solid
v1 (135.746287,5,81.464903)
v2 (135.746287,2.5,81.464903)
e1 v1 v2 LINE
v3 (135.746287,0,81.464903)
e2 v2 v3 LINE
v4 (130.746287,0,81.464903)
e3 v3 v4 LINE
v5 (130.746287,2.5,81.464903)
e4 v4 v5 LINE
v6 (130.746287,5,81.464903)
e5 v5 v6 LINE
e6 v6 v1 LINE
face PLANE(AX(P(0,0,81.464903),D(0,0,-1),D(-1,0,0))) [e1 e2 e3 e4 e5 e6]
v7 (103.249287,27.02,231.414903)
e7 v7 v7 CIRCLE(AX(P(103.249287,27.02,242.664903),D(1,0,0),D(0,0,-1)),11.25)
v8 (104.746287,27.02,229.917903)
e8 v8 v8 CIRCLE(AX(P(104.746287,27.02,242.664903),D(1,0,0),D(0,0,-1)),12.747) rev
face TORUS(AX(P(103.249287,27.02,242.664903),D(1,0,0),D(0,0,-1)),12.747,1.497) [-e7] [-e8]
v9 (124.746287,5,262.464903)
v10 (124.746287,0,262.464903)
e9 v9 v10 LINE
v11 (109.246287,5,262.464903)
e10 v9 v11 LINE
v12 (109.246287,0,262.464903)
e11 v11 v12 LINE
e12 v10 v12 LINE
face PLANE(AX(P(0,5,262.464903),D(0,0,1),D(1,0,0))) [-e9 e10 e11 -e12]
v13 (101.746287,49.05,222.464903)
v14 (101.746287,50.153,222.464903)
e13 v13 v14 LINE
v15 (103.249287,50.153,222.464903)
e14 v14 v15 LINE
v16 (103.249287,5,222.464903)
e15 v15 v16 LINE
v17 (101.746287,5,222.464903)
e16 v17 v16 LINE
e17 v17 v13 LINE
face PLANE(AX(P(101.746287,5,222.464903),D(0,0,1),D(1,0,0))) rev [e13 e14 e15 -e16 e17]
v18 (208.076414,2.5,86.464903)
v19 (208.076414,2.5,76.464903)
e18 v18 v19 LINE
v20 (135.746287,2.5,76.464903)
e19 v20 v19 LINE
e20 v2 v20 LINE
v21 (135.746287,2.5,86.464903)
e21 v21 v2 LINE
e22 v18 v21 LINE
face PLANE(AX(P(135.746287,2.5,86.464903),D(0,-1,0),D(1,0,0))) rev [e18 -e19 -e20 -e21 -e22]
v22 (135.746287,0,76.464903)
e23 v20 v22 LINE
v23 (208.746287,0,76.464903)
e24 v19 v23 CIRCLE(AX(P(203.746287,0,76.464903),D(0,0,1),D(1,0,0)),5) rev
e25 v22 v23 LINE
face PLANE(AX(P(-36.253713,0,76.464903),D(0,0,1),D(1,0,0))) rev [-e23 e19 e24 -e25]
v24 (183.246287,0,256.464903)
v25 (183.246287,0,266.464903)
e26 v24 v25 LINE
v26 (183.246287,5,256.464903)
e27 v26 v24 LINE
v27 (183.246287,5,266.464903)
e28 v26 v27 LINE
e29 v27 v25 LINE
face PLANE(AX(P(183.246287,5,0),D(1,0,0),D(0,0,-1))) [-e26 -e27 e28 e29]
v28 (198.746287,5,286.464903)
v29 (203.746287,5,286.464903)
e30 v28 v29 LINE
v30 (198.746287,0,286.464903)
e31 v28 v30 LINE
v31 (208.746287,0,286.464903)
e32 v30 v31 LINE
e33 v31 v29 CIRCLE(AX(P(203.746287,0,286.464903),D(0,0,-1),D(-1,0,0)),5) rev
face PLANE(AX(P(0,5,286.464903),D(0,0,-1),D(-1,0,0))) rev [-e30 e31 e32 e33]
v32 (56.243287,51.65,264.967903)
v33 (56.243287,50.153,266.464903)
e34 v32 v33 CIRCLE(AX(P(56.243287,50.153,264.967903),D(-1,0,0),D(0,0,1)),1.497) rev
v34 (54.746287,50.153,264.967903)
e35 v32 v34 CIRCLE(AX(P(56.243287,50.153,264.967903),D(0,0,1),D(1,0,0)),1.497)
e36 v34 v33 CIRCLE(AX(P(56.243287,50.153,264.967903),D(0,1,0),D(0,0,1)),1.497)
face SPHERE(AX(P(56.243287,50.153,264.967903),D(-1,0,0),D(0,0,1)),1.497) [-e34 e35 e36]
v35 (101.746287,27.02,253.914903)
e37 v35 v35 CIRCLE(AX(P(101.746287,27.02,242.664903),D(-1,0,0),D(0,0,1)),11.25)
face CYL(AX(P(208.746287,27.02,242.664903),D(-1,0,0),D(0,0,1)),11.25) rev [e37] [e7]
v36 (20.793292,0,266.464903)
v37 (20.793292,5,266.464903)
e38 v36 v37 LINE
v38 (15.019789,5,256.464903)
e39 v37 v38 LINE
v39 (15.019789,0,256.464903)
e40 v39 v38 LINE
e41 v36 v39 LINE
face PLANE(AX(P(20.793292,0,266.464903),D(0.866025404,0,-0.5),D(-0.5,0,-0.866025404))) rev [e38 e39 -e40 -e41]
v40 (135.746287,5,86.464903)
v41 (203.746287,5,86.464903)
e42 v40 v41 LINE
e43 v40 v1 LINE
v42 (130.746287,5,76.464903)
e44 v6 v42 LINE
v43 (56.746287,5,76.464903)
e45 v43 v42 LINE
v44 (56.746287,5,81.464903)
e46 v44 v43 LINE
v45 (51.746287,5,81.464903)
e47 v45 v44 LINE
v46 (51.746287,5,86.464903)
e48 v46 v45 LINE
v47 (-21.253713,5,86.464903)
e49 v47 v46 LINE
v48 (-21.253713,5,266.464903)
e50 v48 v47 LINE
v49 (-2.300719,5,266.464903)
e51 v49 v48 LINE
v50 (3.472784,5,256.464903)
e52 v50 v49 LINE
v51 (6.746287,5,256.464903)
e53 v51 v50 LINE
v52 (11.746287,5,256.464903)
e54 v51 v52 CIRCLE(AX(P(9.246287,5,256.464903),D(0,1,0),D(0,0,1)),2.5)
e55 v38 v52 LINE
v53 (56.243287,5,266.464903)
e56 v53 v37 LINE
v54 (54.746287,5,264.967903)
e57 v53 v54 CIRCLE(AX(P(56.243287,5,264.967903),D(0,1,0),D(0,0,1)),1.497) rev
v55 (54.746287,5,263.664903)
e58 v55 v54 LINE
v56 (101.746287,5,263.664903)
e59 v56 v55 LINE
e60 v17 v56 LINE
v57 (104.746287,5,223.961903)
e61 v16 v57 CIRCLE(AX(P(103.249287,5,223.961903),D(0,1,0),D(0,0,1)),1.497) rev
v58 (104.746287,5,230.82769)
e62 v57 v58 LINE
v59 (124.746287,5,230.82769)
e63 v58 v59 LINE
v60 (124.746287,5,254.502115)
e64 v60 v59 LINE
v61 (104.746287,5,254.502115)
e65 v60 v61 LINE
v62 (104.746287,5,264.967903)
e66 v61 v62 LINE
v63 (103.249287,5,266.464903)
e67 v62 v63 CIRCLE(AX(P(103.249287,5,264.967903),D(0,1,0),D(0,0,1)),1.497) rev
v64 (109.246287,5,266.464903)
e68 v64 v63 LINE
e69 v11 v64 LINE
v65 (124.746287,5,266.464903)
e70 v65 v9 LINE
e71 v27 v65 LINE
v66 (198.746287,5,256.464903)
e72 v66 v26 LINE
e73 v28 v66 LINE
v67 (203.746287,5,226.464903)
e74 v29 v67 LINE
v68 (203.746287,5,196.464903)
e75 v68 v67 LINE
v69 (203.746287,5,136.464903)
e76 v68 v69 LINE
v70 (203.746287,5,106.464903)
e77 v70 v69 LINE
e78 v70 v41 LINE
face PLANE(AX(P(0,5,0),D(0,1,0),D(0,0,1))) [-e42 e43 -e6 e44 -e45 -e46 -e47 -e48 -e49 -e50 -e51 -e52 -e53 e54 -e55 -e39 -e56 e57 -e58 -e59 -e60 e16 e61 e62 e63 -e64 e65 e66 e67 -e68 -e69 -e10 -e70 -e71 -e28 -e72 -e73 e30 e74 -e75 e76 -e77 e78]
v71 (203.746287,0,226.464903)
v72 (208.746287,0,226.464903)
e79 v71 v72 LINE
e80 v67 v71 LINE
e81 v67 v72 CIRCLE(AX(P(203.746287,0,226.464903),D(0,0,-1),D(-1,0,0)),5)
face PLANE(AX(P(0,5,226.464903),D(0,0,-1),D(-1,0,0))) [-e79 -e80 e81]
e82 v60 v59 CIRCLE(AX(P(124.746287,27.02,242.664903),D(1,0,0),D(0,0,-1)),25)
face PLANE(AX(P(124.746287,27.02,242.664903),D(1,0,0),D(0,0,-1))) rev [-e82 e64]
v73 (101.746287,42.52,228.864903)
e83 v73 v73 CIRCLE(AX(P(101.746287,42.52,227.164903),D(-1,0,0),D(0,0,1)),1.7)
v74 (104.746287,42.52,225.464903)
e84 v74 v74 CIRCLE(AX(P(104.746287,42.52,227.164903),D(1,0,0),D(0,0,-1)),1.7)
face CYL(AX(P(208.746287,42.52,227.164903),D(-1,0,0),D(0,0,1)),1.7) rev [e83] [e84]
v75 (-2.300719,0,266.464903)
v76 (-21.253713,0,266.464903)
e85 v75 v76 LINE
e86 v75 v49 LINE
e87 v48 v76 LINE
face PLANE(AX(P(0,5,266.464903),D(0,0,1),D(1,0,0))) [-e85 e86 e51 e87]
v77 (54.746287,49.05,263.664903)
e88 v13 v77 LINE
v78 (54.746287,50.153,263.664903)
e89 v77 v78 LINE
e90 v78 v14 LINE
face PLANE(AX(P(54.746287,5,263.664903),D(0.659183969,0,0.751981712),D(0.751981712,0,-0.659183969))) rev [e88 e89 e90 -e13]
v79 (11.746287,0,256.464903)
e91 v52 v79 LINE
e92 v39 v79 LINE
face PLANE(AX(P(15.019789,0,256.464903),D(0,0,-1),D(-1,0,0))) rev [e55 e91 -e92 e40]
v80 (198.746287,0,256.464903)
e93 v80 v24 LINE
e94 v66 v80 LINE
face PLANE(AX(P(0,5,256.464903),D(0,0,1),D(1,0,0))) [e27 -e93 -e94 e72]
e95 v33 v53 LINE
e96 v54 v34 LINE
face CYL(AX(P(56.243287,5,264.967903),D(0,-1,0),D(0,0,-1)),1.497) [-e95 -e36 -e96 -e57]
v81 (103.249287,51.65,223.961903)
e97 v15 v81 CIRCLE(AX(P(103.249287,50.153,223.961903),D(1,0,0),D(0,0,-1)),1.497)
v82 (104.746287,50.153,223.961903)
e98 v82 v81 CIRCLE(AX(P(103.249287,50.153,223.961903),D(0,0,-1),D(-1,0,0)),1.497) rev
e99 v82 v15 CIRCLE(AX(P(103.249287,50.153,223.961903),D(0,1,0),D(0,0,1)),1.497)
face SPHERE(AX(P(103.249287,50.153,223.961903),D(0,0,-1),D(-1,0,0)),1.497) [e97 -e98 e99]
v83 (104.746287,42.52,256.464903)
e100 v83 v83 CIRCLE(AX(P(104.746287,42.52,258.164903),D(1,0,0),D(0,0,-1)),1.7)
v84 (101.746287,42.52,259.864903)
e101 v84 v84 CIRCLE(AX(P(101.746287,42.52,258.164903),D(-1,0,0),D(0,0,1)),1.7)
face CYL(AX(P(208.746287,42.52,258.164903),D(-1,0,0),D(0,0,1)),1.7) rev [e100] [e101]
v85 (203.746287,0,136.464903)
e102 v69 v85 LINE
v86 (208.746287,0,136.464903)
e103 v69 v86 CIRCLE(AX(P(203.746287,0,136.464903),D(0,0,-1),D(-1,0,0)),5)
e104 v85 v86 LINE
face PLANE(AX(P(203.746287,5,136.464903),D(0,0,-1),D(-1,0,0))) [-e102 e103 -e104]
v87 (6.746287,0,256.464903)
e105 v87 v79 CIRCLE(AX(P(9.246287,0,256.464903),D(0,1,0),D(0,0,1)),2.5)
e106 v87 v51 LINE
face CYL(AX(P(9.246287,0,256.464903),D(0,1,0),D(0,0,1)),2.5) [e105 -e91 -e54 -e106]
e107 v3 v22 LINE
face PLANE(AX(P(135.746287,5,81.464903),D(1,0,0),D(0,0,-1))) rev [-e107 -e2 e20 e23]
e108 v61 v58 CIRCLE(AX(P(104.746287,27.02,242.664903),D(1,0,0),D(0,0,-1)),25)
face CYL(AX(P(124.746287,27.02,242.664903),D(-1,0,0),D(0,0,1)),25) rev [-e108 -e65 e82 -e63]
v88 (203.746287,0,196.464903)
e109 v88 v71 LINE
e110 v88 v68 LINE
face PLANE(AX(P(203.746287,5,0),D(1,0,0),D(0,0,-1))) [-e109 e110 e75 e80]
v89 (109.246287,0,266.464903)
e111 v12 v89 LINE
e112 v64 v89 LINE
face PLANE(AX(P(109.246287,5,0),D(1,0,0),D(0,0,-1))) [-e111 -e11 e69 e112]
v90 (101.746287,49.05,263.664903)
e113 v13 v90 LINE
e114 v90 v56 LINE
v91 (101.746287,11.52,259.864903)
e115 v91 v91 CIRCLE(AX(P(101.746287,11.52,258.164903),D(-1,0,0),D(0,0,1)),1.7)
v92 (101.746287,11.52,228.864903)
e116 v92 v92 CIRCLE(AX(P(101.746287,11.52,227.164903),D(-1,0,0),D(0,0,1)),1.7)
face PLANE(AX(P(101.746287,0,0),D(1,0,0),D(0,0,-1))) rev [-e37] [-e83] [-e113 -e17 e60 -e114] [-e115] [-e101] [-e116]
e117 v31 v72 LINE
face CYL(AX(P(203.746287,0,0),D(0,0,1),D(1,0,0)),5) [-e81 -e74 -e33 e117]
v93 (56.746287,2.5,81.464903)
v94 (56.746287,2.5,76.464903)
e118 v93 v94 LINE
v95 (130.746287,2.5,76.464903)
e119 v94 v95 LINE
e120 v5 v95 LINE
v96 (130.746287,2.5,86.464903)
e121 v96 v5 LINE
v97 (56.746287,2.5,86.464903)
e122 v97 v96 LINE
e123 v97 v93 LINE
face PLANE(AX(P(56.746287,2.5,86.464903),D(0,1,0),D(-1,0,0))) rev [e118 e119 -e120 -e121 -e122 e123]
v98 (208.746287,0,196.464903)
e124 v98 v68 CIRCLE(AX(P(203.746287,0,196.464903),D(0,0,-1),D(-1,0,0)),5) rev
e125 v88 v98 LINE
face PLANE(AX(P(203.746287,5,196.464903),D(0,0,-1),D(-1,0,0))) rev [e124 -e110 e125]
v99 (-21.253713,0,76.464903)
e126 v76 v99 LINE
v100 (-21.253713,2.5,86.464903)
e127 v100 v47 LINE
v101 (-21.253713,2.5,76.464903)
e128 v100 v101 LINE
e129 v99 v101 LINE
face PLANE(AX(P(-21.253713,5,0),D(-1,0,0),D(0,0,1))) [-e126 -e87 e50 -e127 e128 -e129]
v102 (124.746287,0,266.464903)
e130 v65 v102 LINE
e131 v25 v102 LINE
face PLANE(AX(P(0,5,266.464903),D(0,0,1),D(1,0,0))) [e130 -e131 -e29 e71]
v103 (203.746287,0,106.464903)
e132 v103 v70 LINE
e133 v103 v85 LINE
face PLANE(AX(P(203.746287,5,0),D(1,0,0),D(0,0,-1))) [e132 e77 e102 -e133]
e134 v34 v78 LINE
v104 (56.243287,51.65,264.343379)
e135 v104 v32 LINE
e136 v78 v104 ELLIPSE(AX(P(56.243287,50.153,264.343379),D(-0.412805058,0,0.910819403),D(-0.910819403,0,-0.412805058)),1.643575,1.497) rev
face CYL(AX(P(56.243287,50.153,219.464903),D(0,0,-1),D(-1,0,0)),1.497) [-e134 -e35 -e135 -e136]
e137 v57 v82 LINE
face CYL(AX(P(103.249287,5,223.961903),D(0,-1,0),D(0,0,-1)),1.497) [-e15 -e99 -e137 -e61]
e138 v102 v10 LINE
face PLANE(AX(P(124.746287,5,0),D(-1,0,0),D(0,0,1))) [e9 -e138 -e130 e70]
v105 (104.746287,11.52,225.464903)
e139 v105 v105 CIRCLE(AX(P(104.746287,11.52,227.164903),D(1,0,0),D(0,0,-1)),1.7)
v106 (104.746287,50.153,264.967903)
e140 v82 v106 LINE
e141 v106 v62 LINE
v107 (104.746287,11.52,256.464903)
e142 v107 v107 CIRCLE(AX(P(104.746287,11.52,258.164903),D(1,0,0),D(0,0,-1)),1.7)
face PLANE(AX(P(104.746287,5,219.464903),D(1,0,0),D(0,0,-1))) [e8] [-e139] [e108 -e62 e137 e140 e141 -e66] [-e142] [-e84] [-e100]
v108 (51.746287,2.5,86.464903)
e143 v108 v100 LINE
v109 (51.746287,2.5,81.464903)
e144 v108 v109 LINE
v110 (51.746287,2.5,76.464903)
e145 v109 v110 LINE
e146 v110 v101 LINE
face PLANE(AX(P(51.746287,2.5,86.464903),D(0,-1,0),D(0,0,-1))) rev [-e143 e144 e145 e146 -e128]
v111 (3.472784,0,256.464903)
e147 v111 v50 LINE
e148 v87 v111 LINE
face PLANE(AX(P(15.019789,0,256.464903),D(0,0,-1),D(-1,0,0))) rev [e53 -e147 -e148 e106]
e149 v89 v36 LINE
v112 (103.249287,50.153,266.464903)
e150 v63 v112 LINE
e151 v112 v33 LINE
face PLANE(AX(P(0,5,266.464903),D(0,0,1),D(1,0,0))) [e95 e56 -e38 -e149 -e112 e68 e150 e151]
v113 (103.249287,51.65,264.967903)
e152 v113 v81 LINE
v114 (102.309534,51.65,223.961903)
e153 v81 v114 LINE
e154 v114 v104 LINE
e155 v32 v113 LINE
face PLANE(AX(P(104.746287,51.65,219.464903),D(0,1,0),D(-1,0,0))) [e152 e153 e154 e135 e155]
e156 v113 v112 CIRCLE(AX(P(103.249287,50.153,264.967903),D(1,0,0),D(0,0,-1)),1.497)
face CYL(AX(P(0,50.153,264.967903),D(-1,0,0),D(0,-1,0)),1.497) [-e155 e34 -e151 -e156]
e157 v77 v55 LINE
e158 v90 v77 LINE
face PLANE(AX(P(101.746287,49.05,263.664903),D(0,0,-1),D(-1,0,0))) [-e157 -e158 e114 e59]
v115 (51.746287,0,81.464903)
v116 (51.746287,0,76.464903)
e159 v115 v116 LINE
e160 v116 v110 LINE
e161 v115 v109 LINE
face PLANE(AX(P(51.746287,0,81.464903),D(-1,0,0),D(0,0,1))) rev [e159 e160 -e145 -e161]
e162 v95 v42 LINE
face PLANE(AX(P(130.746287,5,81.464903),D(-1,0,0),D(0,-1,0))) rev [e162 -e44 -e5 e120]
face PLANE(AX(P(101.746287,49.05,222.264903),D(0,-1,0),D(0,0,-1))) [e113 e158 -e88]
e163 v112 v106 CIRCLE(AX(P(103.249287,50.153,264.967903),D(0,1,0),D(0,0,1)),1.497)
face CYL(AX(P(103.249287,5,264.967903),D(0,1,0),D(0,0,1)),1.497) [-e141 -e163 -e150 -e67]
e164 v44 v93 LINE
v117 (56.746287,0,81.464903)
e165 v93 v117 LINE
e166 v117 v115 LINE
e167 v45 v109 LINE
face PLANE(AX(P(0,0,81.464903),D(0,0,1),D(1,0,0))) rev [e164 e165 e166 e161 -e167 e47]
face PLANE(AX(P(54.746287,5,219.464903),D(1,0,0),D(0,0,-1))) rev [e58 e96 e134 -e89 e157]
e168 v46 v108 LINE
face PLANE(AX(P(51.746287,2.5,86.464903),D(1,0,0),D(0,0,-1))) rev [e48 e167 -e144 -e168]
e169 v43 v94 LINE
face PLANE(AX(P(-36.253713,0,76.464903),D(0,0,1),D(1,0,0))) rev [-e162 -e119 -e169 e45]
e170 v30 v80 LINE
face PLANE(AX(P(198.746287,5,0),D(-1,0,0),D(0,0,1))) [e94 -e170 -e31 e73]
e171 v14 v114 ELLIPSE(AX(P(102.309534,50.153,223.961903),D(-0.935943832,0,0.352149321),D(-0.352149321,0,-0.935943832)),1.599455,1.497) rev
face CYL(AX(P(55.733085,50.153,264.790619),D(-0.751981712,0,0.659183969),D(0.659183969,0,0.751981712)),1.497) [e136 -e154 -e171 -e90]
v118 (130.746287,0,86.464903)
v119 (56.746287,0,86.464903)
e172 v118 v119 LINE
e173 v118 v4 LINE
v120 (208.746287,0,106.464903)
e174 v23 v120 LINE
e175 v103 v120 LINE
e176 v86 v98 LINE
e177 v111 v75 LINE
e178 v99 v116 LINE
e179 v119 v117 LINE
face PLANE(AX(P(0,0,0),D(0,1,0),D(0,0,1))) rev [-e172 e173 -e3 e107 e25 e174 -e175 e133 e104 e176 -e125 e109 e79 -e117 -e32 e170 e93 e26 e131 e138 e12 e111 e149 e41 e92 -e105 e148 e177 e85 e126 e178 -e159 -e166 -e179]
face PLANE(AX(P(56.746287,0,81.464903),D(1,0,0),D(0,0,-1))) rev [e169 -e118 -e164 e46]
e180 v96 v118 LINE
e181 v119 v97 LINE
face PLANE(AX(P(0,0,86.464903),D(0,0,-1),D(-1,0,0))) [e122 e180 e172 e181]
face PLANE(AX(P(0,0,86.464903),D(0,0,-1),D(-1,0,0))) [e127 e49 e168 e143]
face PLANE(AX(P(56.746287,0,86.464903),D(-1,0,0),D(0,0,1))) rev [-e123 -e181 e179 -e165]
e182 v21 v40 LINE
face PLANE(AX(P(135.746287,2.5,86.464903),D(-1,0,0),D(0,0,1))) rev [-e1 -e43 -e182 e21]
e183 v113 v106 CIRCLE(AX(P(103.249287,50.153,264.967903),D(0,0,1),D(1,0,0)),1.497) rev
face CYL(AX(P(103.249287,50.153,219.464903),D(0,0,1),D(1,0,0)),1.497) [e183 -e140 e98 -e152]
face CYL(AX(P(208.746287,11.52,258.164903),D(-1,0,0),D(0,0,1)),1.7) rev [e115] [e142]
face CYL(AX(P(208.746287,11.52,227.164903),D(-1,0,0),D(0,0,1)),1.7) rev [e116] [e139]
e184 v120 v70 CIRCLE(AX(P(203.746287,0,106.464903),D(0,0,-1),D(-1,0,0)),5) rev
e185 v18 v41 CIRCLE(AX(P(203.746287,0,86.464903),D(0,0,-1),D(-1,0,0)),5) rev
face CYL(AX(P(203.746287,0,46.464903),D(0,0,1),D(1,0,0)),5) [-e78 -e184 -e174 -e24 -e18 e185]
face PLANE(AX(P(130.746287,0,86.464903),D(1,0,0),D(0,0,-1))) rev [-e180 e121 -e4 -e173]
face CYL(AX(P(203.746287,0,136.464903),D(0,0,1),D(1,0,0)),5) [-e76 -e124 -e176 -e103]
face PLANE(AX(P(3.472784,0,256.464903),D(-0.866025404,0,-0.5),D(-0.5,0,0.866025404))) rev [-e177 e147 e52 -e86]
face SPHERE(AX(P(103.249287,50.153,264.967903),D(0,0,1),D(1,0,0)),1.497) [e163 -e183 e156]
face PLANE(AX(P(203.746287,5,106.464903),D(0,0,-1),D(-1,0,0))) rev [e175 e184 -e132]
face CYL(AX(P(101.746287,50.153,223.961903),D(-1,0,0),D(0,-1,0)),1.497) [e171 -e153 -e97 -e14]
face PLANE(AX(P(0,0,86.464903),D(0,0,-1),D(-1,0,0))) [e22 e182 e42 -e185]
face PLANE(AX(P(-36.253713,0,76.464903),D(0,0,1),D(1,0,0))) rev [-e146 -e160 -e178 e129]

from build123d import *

# Parameters (mm, degrees)
SKETCH_1_W           = 5
SKETCH_1_H           = 60
SKETCH_1_W_2         = 30
SKETCH_1_H_2         = 5
SKETCH_1_W_3         = 15
EXTRUDE_1_DEPTH      = 5
FILLET_1_R           = 5
SKETCH_2_W           = 245
SKETCH_2_H           = 125
CUT_EXTRUDE_1_DEPTH  = 5
SKETCH_3_W           = 74
SKETCH_3_H           = 2.5
SKETCH_3_W_2         = 73
CUT_EXTRUDE_2_DEPTH  = 10
SKETCH_4_W           = 5
SKETCH_4_H           = 5
CUT_EXTRUDE_3_DEPTH  = 5
SKETCH_5_W           = 50
SKETCH_5_H           = 46.65
EXTRUDE_2_DEPTH      = 47
SKETCH_6_W           = 41.4
SKETCH_6_H           = 44.05
CUT_EXTRUDE_4_DEPTH  = 47
SKETCH_7_R           = 11.25
CUT_EXTRUDE_5_DEPTH  = 317.004529962
CUT_EXTRUDE_6_DEPTH  = 46.65
SKETCH_10_R          = 1.7
CUT_EXTRUDE_7_DEPTH  = 317.004529962
SKETCH_13_R          = 25
CUT_EXTRUDE_9_DEPTH  = 20
FILLET_11_R          = 1.497
CUT_EXTRUDE_10_DEPTH = 358.50996514
SKETCH_17_R          = 2.5
EXTRUDE_3_DEPTH      = 5


with BuildPart() as part:
    # 草圖1 → 填料-伸長1 (new body)
    with BuildSketch(Plane(origin=(0, 0, 0), x_dir=(1, 0, 0), z_dir=(0, 1, 0))):
        Polygon((198.746286718, -286.464902661), (198.746286718, -256.464902661), (183.246286718, -256.464902661), (183.246286718, -266.464902661), (124.746286718, -266.464902661), (124.746286718, -262.464902661), (109.246286718, -262.464902661), (109.246286718, -266.464902661), (-21.253713282, -266.464902661), (-21.253713282, 38.535097339), (-36.253713282, 38.535097339), (-36.253713282, 43.535097339), (203.746286718, 43.535097339), (203.746286718, -286.464902661), align=None)
        with Locations((206.246286718, -256.464902661)):
            Rectangle(SKETCH_1_W, SKETCH_1_H)
        with Locations((206.246286718, 13.535097339)):
            Rectangle(SKETCH_1_W, SKETCH_1_H)
        with Locations((188.746286718, 46.035097339)):
            Rectangle(SKETCH_1_W_2, SKETCH_1_H_2)
        with Locations((-21.253713282, 46.035097339)):
            Rectangle(SKETCH_1_W_2, SKETCH_1_H_2)
        with Locations((91.246286718, 46.035097339)):
            Rectangle(SKETCH_1_W_3, SKETCH_1_H_2)
        with Locations((76.246286718, 46.035097339)):
            Rectangle(SKETCH_1_W_3, SKETCH_1_H_2)
        with Locations((206.246286718, -166.464902661)):
            Rectangle(SKETCH_1_W, SKETCH_1_H)
        with Locations((206.246286718, -76.464902661)):
            Rectangle(SKETCH_1_W, SKETCH_1_H)
    extrude(amount=EXTRUDE_1_DEPTH)

    # 圓角1
    fillet_1_edges = [part.edges().sort_by_distance(p)[0] for p in [
        (208.746286718, 5, -13.535097339),
        (208.746286718, 5, 76.464902661),
        (208.746286718, 5, 166.464902661),
        (208.746286718, 5, 256.464902661),
    ]]
    fillet(fillet_1_edges, radius=FILLET_1_R - 0.0001)  # a hair under: the kernel refuses the full size

    # 草圖2 → 除料-伸長1 (cut)
    with BuildSketch(Plane(origin=(0, 5, 0), x_dir=(1, 0, 0), z_dir=(0, 1, 0))):
        with Locations((86.246286718, -13.964902661)):
            Rectangle(SKETCH_2_W, SKETCH_2_H)
    extrude(amount=-CUT_EXTRUDE_1_DEPTH, mode=Mode.SUBTRACT)

    # 草圖3 → 除料-伸長2 (cut)
    with BuildSketch(Plane(origin=(0, 0, 76.464902661), x_dir=(-1, 0, 0), z_dir=(0, 0, -1))):
        with Locations((-93.746286718, 1.25)):
            Rectangle(SKETCH_3_W, SKETCH_3_H)
        with Locations((-172.246286718, 3.75)):
            Rectangle(SKETCH_3_W_2, SKETCH_3_H)
        with Locations((-15.246286718, 3.75)):
            Rectangle(SKETCH_3_W_2, SKETCH_3_H)
    extrude(amount=-CUT_EXTRUDE_2_DEPTH, mode=Mode.SUBTRACT)

    # 草圖4 → 除料-伸長3 (cut)
    with BuildSketch(Plane(origin=(0, 0, 76.464902661), x_dir=(-1, 0, 0), z_dir=(0, 0, -1))):
        with Locations((-133.246286718, 2.5)):
            Rectangle(SKETCH_4_W, SKETCH_4_H)
        with Locations((-54.246286718, 2.5)):
            Rectangle(SKETCH_4_W, SKETCH_4_H)
    extrude(amount=-CUT_EXTRUDE_3_DEPTH, mode=Mode.SUBTRACT)

    # 草圖5 → 填料-伸長2 (add)
    with BuildSketch(Plane.XY.offset(266.464902661)):
        with Locations((79.746286718, 28.325)):
            Rectangle(SKETCH_5_W, SKETCH_5_H)
    extrude(amount=-EXTRUDE_2_DEPTH)

    # 草圖6 → 除料-伸長4 (cut)
    with BuildSketch(Plane.ZY.offset(-54.746286718)):
        with Locations((242.964902661, 27.025)):
            Rectangle(SKETCH_6_W, SKETCH_6_H)
    extrude(amount=-CUT_EXTRUDE_4_DEPTH, mode=Mode.SUBTRACT)

    # 草圖7 → 除料-伸長5 (cut, through all)
    with BuildSketch(Plane.ZY.offset(-101.746286718)):
        with Locations((242.664902661, 27.02)):
            Circle(SKETCH_7_R)
    extrude(amount=-CUT_EXTRUDE_5_DEPTH, mode=Mode.SUBTRACT)

    # 草圖8 → 除料-伸長6 (cut)
    with BuildSketch(Plane(origin=(0, 51.65, 0), x_dir=(1, 0, 0), z_dir=(0, 1, 0))):
        Polygon((54.746286718, -263.664902661), (101.746286718, -222.464902661), (104.746286718, -222.464902661), (104.746286718, -219.464902661), (54.746286718, -219.464902661), align=None)
    extrude(amount=-CUT_EXTRUDE_6_DEPTH, mode=Mode.SUBTRACT)

    # 草圖10 → 除料-伸長7 (cut, through all)
    with BuildSketch(Plane.ZY.offset(-101.746286718)):
        with Locations((227.164902661, 42.52)):
            Circle(SKETCH_10_R)
        with Locations((258.164902661, 42.52)):
            Circle(SKETCH_10_R)
        with Locations((258.164902661, 11.52)):
            Circle(SKETCH_10_R)
        with Locations((227.164902661, 11.52)):
            Circle(SKETCH_10_R)
    extrude(amount=-CUT_EXTRUDE_7_DEPTH, mode=Mode.SUBTRACT)

    # 草圖13 → 除料-伸長9 (cut)
    with BuildSketch(Plane(origin=(104.746286718, 0, 0), x_dir=(0, 0, -1), z_dir=(1, 0, 0))):
        with Locations((-242.664902661, 27.02)):
            Circle(SKETCH_13_R)
    extrude(amount=CUT_EXTRUDE_9_DEPTH, mode=Mode.SUBTRACT)

    # 圓角11
    fillet_11_edges = [part.edges().sort_by_distance(p)[0] for p in [
        (54.746286718, 28.325, 266.464902661),
        (79.746286718, 51.65, 266.464902661),
        (104.746286718, 28.325, 266.464902661),
        (104.746286718, 27.02, 231.414902661),
        (54.746286718, 51.65, 265.064902661),
        (104.746286718, 51.65, 244.464902661),
        (104.746286718, 28.325, 222.464902661),
        (78.246286718, 51.65, 243.064902661),
        (103.246286718, 51.65, 222.464902661),
    ]]
    fillet(fillet_11_edges, radius=FILLET_11_R)

    # 草圖14 → 除料-伸長10 (cut, through all)
    with BuildSketch(Plane(origin=(0, 5, 0), x_dir=(1, 0, 0), z_dir=(0, 1, 0))):
        Polygon((20.793292101, -266.464902661), (15.019789409, -256.464902661), (3.472784026, -256.464902661), (-2.300718666, -266.464902661), (3.472784026, -276.464902661), (15.019789409, -276.464902661), align=None)
    extrude(amount=-CUT_EXTRUDE_10_DEPTH, mode=Mode.SUBTRACT)

    # 草圖17 → 填料-伸長3 (add)
    with BuildSketch(Plane(origin=(0, 5, 0), x_dir=(1, 0, 0), z_dir=(0, 1, 0))):
        with Locations((9.246286718, -256.464902661)):
            Circle(SKETCH_17_R)
    extrude(amount=-EXTRUDE_3_DEPTH)


solid = part.part
